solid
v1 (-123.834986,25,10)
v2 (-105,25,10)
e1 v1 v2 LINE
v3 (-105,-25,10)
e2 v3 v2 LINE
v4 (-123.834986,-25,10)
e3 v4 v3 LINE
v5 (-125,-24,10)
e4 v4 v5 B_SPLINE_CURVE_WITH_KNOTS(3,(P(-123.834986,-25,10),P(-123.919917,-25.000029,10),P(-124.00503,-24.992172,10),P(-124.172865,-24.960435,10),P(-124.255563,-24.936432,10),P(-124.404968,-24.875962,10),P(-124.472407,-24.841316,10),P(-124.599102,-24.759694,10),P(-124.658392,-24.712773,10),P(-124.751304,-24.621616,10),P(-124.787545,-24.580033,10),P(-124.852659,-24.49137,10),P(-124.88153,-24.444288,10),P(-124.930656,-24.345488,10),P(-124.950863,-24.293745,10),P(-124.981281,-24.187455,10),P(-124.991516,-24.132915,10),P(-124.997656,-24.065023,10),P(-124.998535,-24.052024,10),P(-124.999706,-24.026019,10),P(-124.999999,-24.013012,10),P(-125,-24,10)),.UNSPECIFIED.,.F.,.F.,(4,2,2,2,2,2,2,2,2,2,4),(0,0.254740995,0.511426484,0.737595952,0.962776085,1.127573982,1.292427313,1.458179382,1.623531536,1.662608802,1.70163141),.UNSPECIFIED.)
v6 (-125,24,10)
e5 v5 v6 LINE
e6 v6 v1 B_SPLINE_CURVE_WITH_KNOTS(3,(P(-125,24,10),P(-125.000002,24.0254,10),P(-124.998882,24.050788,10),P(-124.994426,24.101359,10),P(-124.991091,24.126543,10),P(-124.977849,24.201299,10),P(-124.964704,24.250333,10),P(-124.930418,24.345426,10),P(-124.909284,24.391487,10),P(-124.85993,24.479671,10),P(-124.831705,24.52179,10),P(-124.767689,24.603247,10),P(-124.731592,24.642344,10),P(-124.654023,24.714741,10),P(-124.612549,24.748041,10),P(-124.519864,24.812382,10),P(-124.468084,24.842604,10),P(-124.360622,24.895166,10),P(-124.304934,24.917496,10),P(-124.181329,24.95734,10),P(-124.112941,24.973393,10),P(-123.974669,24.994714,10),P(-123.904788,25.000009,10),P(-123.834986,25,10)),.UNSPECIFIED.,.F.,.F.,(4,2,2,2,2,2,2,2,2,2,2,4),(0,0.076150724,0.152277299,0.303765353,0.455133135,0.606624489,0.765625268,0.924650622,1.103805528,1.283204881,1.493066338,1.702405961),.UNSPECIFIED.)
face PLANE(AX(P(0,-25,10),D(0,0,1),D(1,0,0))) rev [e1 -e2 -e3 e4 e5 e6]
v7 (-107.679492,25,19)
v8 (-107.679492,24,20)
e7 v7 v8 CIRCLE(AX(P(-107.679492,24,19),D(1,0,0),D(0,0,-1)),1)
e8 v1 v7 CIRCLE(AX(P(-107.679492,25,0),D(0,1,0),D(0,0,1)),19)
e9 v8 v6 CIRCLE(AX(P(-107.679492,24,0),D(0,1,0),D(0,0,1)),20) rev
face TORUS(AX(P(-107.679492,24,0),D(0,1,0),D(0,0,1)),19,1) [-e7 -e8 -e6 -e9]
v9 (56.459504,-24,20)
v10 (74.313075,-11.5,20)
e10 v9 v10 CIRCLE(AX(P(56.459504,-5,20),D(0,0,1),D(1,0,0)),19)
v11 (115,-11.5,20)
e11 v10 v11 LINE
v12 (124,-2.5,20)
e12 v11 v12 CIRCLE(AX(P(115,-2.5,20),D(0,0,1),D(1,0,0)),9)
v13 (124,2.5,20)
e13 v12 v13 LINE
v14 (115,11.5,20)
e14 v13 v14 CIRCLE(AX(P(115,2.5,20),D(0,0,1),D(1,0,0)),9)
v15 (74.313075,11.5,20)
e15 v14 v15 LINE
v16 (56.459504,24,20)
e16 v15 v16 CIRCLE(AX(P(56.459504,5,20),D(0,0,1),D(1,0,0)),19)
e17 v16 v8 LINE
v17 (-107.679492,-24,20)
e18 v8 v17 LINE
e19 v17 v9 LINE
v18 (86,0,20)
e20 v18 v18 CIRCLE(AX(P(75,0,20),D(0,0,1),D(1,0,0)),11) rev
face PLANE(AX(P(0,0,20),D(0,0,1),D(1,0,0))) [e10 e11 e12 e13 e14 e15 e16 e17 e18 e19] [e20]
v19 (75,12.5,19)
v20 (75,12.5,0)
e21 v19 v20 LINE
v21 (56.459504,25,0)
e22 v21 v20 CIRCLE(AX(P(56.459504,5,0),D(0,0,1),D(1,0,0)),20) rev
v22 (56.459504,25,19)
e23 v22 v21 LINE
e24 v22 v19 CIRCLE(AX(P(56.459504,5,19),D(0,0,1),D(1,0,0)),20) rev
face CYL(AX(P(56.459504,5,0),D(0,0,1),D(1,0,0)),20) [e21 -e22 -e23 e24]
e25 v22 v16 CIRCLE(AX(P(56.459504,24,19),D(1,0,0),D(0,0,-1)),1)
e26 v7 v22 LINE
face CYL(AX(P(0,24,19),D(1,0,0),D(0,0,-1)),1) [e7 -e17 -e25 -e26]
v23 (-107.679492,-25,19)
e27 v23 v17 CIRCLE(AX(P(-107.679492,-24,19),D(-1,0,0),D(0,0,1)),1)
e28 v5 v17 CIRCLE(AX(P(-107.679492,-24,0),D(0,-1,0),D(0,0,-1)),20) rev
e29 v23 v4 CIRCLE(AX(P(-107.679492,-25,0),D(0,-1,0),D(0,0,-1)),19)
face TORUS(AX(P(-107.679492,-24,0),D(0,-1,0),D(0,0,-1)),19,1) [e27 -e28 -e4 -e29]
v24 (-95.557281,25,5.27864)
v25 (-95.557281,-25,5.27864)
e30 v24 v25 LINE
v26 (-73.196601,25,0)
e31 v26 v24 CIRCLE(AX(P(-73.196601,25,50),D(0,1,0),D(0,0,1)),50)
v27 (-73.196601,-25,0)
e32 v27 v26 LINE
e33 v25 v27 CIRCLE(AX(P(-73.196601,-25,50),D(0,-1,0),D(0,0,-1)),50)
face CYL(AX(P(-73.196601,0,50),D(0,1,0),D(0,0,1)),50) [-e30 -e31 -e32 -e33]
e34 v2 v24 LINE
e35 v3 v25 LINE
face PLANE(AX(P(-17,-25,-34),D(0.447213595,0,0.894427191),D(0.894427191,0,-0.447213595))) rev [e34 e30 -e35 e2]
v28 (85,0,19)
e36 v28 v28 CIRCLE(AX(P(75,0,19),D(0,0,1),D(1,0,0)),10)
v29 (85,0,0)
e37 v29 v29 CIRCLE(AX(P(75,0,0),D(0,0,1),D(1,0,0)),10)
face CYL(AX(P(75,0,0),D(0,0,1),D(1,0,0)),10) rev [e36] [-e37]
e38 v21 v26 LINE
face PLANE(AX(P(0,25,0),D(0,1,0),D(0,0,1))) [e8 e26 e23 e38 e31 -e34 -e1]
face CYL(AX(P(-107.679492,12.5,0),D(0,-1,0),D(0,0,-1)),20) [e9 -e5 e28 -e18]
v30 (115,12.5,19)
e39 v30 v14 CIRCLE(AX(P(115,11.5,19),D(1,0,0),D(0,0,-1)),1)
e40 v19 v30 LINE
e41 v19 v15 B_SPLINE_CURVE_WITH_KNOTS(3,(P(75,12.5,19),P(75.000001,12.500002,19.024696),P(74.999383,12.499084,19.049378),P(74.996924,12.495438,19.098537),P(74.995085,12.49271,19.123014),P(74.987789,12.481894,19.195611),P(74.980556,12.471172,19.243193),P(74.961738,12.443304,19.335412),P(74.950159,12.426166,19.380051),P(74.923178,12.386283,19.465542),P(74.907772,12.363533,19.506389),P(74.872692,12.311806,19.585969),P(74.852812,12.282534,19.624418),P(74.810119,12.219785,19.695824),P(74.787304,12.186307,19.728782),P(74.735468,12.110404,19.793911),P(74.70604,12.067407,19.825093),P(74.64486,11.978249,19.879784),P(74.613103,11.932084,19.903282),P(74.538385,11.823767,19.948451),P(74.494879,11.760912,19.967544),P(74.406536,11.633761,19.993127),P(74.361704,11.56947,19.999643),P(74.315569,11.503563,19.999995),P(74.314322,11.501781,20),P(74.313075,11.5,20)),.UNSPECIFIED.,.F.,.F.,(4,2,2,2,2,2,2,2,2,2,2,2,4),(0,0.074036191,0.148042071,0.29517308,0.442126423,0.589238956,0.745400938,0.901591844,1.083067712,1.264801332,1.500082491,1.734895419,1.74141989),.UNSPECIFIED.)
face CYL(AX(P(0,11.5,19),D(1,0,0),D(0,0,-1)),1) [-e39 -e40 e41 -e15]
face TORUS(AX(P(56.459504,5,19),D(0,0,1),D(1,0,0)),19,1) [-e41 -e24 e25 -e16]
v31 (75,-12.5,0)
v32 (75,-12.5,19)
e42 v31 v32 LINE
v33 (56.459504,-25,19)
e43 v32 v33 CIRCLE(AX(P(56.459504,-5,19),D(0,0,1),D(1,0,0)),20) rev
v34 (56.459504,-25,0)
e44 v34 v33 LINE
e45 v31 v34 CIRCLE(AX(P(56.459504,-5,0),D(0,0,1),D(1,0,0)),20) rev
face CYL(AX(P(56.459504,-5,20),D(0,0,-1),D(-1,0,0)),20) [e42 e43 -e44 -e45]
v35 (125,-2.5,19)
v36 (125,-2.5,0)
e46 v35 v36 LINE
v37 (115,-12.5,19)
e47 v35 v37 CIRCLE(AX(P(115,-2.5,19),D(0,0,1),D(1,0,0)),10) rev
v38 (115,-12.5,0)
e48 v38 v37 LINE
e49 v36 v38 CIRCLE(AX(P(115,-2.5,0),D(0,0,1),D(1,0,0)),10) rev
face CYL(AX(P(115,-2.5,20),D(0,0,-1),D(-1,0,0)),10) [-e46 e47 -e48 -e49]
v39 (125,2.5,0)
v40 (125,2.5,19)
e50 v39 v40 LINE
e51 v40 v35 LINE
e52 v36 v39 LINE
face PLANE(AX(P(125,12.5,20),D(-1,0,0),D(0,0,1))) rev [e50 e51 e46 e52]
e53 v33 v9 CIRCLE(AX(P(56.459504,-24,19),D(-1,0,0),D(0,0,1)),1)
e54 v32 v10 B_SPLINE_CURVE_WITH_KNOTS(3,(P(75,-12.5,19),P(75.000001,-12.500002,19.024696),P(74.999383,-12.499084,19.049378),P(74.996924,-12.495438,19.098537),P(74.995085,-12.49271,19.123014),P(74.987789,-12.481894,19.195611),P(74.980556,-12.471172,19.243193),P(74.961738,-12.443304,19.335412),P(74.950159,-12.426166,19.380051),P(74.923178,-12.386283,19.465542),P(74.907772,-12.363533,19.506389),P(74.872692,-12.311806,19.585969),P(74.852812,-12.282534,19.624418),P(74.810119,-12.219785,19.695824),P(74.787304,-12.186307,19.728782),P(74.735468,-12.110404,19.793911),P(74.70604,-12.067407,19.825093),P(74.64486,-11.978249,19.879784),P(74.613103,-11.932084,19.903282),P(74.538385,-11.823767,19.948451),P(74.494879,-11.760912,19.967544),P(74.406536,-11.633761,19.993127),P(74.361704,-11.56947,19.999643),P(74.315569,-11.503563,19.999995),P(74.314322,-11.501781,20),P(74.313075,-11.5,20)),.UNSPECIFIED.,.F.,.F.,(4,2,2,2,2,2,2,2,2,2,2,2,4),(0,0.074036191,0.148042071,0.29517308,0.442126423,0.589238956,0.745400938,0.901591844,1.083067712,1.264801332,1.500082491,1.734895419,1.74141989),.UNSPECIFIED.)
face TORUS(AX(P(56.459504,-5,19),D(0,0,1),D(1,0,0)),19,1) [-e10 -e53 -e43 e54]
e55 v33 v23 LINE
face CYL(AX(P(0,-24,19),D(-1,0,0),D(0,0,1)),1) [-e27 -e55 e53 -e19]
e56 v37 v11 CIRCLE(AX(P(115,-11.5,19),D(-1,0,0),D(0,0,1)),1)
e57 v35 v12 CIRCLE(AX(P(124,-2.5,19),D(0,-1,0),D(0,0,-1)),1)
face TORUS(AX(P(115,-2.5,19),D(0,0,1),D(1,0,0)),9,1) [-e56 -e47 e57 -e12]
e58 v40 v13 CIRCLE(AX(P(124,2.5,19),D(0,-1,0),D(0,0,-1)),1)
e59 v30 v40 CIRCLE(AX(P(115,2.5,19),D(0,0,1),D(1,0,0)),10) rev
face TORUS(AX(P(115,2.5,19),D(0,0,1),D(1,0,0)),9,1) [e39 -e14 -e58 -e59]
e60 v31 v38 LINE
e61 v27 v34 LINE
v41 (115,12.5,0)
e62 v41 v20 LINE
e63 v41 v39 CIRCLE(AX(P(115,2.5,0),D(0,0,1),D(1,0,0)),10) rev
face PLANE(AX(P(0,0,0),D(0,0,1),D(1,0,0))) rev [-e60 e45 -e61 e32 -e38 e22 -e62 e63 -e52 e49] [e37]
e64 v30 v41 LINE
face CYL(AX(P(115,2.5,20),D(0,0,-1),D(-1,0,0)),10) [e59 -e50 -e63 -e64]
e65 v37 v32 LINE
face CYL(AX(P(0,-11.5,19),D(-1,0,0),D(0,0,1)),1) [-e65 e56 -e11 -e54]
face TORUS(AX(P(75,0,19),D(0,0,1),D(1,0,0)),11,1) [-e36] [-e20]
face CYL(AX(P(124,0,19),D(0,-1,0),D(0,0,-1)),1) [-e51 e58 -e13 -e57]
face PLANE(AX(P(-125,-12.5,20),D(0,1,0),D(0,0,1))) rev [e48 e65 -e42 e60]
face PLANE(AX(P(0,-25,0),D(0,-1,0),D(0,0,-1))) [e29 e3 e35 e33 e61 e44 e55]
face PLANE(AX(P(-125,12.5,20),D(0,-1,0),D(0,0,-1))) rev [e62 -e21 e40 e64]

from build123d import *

# Parameters (mm, degrees)
SKETCH1_W           = 250
SKETCH1_H           = 25
BOSS_EXTRUDE3_DEPTH = 20
SKETCH4_R           = 10
CUT_EXTRUDE3_DEPTH  = 20
SKETCH6_W           = 200
SKETCH6_H           = 20
BOSS_EXTRUDE4_DEPTH = 12.5
SKETCH7_W           = 200
SKETCH7_H           = 20
BOSS_EXTRUDE5_DEPTH = 12.5
CUT_EXTRUDE8_DEPTH  = 137.106575888
FILLET10_R          = 20
FILLET11_R          = 20
FILLET12_R          = 10
FILLET13_R          = 50
FILLET15_R          = 1


with BuildPart() as part:
    # Sketch1 → Boss-Extrude3 (new body)
    with BuildSketch(Plane.XY):
        Rectangle(SKETCH1_W, SKETCH1_H)
    extrude(amount=BOSS_EXTRUDE3_DEPTH)

    # Sketch4 → Cut-Extrude3 (cut)
    with BuildSketch(Plane.XY.offset(20)):
        with Locations((75, 0)):
            Circle(SKETCH4_R)
    extrude(amount=-CUT_EXTRUDE3_DEPTH, mode=Mode.SUBTRACT)

    # Sketch6 → Boss-Extrude4 (add)
    with BuildSketch(Plane(origin=(0, 12.5, 0), x_dir=(1, 0, 0), z_dir=(0, 1, 0))):
        with Locations((-25, -10)):
            Rectangle(SKETCH6_W, SKETCH6_H)
    extrude(amount=BOSS_EXTRUDE4_DEPTH)

    # Sketch7 → Boss-Extrude5 (add)
    with BuildSketch(Plane.XZ.offset(12.5)):
        with Locations((-25, 10)):
            Rectangle(SKETCH7_W, SKETCH7_H)
    extrude(amount=BOSS_EXTRUDE5_DEPTH)

    # Sketch8 → Cut-Extrude8 (cut, through all)
    with BuildSketch(Plane(origin=(0, 25, 0), x_dir=(1, 0, 0), z_dir=(0, 1, 0))):
        Polygon((-85, 0), (-125, 0), (-125, -10), (-105, -10), align=None)
    extrude(amount=-CUT_EXTRUDE8_DEPTH, mode=Mode.SUBTRACT)

    # Fillet10
    # the kernel refuses this fillet: 20 mm, written as the material it takes off along each edge
    with BuildSketch(Plane(origin=(-125, 68.301270189, 20), x_dir=(1, 0, 0), z_dir=(0, -1, 0))) as fillet10_piece_1:
        with BuildLine():
            CenterArc((17.320508076, -20), FILLET10_R, 90, 60)
            Line((0, -10), (-0.346410162, -9.8))
            ThreePointArc((-0.346410162, -9.8), (-0.4, -5), (-0.4, 0))
            Line((-0.4, 0), (0, 0.4))
            Line((0, 0.4), (17.320508076, 0.4))
            Line((17.320508076, 0.4), (17.320508076, 0))
        make_face()
    extrude(amount=136.602540378, mode=Mode.SUBTRACT)

    # Fillet11
    # the kernel refuses this fillet: 20 mm, written as the material it takes off along each edge
    with BuildSketch(Plane(origin=(75, -25, 66.351240544), x_dir=(-1, 0, 0), z_dir=(0, 0, -1))) as fillet11_piece_1:
        with BuildLine():
            CenterArc((18.540496218, 20), FILLET11_R, 202.024312837, 67.975687163)
            Line((0, 12.5), (-0.370809924, 12.35))
            ThreePointArc((-0.370809924, 12.35), (-0.4, 6.25), (-0.4, 0))
            Line((-0.4, 0), (0, -0.4))
            Line((0, -0.4), (18.540496218, -0.4))
            Line((18.540496218, -0.4), (18.540496218, 0))
        make_face()
    extrude(amount=112.702481089, mode=Mode.SUBTRACT)
    with BuildSketch(Plane(origin=(75, 25, -46.351240544), x_dir=(0, -1, 0), z_dir=(0, 0, 1))) as fillet11_piece_2:
        with BuildLine():
            CenterArc((20, -18.540496218), FILLET11_R, 112.024312837, 67.975687163)
            Line((0, -18.540496218), (-0.4, -18.540496218))
            Line((-0.4, -18.540496218), (-0.4, 0))
            Line((-0.4, 0), (0, 0.4))
            ThreePointArc((0, 0.4), (6.25, 0.4), (12.35, 0.370809924))
            Line((12.35, 0.370809924), (12.5, 0))
        make_face()
    extrude(amount=112.702481089, mode=Mode.SUBTRACT)

    # Fillet12
    fillet12_edges = [part.edges().sort_by_distance(p)[0] for p in [
        (125, -12.5, 10),
        (125, 12.5, 10),
    ]]
    fillet(fillet12_edges, radius=FILLET12_R)

    # Fillet13
    fillet13_edges = [part.edges().sort_by_distance(p)[0] for p in [
        (-85, 0, 0),
    ]]
    fillet(fillet13_edges, radius=FILLET13_R)

    # Fillet15
    fillet15_edges = [part.edges().sort_by_distance(p)[0] for p in [
        (65, 0, 20),
        (95, -12.5, 20),
        (-25.609994071, 25, 20),
        (-117.679491924, -25, 17.320508076),
        (-117.679491924, 25, 17.320508076),
        (-25.609994071, -25, 20),
        (67.63984367, 21.583123952, 20),
        (67.63984367, -21.583123952, 20),
        (95, 12.5, 20),
        (125, 0, 20),
        (122.071067812, -9.571067812, 20),
        (122.071067812, 9.571067812, 20),
    ]]
    fillet(fillet15_edges, radius=FILLET15_R)


solid = part.part
